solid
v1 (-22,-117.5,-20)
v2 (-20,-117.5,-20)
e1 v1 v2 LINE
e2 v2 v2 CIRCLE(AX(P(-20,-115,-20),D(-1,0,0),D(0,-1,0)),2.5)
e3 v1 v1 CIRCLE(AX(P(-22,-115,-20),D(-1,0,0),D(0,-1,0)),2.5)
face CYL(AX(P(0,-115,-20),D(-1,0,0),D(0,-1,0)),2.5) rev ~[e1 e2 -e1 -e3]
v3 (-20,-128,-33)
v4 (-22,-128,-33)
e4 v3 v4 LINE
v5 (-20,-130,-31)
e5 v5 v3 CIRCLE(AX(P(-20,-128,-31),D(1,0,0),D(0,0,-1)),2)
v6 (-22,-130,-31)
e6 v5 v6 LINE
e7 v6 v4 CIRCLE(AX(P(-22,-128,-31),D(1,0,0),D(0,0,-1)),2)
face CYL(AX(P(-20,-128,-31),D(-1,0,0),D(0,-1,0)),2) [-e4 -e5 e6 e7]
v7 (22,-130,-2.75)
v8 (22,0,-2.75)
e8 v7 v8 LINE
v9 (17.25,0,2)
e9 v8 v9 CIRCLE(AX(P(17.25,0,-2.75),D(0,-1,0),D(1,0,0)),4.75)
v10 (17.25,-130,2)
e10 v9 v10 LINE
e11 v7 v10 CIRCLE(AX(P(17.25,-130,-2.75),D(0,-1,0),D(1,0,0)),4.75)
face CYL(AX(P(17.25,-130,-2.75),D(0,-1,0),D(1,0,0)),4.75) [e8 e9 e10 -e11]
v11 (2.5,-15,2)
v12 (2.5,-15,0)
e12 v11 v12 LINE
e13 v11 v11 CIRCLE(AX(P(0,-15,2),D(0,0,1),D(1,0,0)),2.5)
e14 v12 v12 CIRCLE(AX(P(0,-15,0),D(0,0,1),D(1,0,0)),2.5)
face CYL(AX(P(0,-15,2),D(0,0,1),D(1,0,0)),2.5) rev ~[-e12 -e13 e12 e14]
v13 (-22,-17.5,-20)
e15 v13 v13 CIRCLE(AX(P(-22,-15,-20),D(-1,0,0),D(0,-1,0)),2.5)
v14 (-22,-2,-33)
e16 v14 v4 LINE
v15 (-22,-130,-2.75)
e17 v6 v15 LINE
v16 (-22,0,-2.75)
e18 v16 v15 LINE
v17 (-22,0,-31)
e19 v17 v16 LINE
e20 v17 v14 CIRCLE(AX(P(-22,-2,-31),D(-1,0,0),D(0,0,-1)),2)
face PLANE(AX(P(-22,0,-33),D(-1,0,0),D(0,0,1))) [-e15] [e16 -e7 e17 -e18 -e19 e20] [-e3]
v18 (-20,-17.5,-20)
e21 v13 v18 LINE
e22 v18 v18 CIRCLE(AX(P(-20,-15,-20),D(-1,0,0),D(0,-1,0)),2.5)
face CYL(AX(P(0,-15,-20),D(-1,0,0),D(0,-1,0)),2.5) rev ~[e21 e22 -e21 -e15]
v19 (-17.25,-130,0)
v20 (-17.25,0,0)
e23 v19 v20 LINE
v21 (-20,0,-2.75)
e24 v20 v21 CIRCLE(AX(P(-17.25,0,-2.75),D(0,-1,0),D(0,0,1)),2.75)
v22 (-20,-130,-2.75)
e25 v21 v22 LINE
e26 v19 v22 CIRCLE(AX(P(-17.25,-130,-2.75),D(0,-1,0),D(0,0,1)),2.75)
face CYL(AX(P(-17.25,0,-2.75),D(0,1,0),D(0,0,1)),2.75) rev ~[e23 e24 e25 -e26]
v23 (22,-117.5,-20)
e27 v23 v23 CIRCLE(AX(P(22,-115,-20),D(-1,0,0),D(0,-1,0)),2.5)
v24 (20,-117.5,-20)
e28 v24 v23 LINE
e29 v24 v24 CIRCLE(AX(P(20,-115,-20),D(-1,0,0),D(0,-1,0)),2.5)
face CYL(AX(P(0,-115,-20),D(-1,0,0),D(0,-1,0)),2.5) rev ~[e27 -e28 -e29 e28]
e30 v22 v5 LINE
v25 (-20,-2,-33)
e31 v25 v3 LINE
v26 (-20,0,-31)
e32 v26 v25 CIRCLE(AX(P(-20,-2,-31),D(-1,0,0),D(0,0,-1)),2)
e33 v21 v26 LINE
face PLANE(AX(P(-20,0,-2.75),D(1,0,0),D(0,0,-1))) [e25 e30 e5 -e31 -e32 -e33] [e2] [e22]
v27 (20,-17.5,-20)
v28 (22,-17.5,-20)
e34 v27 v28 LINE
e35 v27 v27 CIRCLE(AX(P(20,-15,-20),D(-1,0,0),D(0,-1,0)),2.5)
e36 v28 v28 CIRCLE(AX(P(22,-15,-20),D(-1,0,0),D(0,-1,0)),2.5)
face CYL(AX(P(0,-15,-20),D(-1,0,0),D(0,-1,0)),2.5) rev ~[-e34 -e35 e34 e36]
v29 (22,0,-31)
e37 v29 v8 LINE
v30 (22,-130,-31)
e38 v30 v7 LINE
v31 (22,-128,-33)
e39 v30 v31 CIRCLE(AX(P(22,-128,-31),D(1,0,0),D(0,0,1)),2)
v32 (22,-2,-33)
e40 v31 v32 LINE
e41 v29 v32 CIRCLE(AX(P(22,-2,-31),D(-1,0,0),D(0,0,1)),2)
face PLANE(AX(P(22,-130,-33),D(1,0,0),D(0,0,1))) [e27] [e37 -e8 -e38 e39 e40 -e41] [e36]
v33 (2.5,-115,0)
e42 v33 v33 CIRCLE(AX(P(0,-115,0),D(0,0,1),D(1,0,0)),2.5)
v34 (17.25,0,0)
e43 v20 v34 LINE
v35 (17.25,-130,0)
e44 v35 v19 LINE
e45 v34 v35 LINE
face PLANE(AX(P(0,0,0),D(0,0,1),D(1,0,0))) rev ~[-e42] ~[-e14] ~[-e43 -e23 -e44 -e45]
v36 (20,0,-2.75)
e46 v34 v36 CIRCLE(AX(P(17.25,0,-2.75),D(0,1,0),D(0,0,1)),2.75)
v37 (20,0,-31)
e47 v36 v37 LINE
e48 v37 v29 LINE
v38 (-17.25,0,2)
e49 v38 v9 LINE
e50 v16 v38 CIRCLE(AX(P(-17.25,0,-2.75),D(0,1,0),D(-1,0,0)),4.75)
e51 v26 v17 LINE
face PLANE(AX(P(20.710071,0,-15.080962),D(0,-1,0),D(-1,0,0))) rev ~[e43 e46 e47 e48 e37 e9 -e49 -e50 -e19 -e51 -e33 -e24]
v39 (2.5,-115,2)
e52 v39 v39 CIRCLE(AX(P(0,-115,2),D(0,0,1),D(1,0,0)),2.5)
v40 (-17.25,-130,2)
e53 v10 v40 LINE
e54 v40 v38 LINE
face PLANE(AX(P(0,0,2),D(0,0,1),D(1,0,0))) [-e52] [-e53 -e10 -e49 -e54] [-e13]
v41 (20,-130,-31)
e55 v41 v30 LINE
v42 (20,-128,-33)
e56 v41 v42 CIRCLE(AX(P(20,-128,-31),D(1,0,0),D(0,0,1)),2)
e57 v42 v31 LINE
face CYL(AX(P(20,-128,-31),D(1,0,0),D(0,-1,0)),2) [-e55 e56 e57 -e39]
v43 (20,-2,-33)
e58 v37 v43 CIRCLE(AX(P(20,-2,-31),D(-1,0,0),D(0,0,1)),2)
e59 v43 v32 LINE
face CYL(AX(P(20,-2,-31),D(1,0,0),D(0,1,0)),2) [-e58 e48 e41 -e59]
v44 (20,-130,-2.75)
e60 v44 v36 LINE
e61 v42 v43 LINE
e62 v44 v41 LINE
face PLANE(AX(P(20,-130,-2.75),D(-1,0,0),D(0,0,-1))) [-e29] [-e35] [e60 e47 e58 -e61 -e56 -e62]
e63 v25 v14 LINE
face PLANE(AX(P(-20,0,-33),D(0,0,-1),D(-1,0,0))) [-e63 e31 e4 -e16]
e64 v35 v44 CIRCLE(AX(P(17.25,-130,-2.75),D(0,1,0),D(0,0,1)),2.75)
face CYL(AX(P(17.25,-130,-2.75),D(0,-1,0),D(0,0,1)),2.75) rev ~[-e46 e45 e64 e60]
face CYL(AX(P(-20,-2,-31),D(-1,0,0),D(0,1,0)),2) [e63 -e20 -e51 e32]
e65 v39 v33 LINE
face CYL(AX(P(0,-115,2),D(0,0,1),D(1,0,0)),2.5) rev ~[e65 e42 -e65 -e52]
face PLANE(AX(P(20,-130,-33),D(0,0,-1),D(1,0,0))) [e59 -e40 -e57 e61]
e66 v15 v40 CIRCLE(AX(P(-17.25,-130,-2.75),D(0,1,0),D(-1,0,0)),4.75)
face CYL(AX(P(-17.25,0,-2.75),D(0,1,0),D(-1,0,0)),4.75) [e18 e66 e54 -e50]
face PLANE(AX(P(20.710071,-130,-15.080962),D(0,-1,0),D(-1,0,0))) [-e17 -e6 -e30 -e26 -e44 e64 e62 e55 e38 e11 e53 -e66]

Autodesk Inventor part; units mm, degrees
ref_plane "YZ Plane" through (0, 0, 0) normal (1, 0, 0) x (0, 1, 0)
ref_plane "XZ Plane" through (0, 0, 0) normal (0, 1, 0) x (-1, 0, 0)
ref_plane "XY Plane" through (0, 0, 0) normal (0, 0, 1) x (1, 0, 0)
sketch "Sketch1" plane through (0, 0, 0) normal (0, 0, 1) x (1, 0, 0)
  line L0 (-20, 0) -> (20, 0)
  line L1 (20, 0) -> (20, -130)
  line L2 (20, -130) -> (-20, -130)
  line L3 (-20, -130) -> (-20, 0)
  point P0 (0, 0)
  point P1 (0, 0)
  dimension "d0" = 40
  dimension "d1" = 130
extrude "Plate1" add sketch "Sketch1" along normal blind 2
sketch "Sketch2" plane through (20, -130, 0) normal (1, 0, 0) x (0, 1, 0)
  line L0 (130, 0) -> (0, 0)
  line L1 (0, 0) -> (0, -33)
  line L2 (0, -33) -> (130, -33)
  line L3 (130, -33) -> (130, 0)
edge flange "Flange1" height 35 angle 90 thickness 2 bend radius 2.75 thickness toward (1, 0, 0) relief round relief width 2 relief depth 1 corner gap 2.75 corner form 0 edges at (20, -65, 0) (-20, -65, 0) wall of the first edge with corners at (20, 0, 0) (20, -130, 0) (20, -130, -33) (20, 0, -33)
bend "Bend1"
corner "Corner1"
sketch "Sketch3" plane through (0, 0, 0) normal (1, 0, 0) x (0, 1, 0)
  line L0 (0, -33) -> (-130, -33) projected
  line L1 (-115, -20) -> (-115, -20) construction
  line L2 (-117.5, -20) -> (-117.5, -20)
  line L3 (-112.5, -20) -> (-112.5, -20)
  arc A0 (-112.5, -20) -> (-117.5, -20) centre (-115, -20) ccw
  arc A1 (-117.5, -20) -> (-112.5, -20) centre (-115, -20) ccw
  line L4 (-130, -2.75) -> (-130, -33) projected
  point P0 (0, 0)
  point P1 (-115, -20)
  dimension "d14" = 0
  dimension "d15" = 13
  dimension "d17" = 2.5
  dimension "d18" = 15
extrude "Extrusion1" cut sketch "Sketch3" along normal through all both and the other way through all
sketch "Sketch6" plane through (0, 0, 2) normal (0, 0, 1) x (1, 0, 0)
  line L0 (-17.25, 0) -> (17.25, 0) projected
  circle A0 centre (0, -115) radius 2.5
  line L1 (22, -112.5) -> (22, -117.5) projected
  point P0 (0, 0)
  point P1 (0, 0)
  point P2 (22, -115)
  dimension "d27" = 5
extrude "Extrusion3" cut sketch "Sketch6" against normal blind 10
fillet "Fillet1" radius 2 4 edges at (21, 0, -33) (-21, 0, -33) (21, -130, -33) (-21, -130, -33)
pattern_linear "Rectangular Pattern2" count 2 spacing 100 along (0, 1, 0) of "Extrusion1", "Extrusion3"
equation "\"d2\" = Thickness"
equation "\"d3\" = BendReliefWidth"
equation "\"d4\" = BendReliefDepth"
equation "\"d5\" = MinimumRemnant"
equation "\"d6\" = TransitionRadius"
equation "\"d9\" = BendRadius"
equation "\"d10\" = CornerReliefSize"
equation "\"d11\" = GapSize"
equation "\"d12\" = JacobiRadiusSize"
equation "\"BendReliefWidth\" = Thickness"
equation "\"BendReliefDepth\" = 0.5 * Thickness"
equation "\"CornerReliefSize\" = 4 * Thickness"
equation "\"MinimumRemnant\" = 2 * Thickness"
equation "\"TransitionRadius\" = BendRadius"
equation "\"JacobiRadiusSize\" = BendRadius"
equation "\"GapSize\" = Thickness"
equation "\"Thickness\" = 2"
equation "\"BendRadius\" = 2.75"
properties part number "NDM 11.027 bracket 27" material "Stainless Steel"
